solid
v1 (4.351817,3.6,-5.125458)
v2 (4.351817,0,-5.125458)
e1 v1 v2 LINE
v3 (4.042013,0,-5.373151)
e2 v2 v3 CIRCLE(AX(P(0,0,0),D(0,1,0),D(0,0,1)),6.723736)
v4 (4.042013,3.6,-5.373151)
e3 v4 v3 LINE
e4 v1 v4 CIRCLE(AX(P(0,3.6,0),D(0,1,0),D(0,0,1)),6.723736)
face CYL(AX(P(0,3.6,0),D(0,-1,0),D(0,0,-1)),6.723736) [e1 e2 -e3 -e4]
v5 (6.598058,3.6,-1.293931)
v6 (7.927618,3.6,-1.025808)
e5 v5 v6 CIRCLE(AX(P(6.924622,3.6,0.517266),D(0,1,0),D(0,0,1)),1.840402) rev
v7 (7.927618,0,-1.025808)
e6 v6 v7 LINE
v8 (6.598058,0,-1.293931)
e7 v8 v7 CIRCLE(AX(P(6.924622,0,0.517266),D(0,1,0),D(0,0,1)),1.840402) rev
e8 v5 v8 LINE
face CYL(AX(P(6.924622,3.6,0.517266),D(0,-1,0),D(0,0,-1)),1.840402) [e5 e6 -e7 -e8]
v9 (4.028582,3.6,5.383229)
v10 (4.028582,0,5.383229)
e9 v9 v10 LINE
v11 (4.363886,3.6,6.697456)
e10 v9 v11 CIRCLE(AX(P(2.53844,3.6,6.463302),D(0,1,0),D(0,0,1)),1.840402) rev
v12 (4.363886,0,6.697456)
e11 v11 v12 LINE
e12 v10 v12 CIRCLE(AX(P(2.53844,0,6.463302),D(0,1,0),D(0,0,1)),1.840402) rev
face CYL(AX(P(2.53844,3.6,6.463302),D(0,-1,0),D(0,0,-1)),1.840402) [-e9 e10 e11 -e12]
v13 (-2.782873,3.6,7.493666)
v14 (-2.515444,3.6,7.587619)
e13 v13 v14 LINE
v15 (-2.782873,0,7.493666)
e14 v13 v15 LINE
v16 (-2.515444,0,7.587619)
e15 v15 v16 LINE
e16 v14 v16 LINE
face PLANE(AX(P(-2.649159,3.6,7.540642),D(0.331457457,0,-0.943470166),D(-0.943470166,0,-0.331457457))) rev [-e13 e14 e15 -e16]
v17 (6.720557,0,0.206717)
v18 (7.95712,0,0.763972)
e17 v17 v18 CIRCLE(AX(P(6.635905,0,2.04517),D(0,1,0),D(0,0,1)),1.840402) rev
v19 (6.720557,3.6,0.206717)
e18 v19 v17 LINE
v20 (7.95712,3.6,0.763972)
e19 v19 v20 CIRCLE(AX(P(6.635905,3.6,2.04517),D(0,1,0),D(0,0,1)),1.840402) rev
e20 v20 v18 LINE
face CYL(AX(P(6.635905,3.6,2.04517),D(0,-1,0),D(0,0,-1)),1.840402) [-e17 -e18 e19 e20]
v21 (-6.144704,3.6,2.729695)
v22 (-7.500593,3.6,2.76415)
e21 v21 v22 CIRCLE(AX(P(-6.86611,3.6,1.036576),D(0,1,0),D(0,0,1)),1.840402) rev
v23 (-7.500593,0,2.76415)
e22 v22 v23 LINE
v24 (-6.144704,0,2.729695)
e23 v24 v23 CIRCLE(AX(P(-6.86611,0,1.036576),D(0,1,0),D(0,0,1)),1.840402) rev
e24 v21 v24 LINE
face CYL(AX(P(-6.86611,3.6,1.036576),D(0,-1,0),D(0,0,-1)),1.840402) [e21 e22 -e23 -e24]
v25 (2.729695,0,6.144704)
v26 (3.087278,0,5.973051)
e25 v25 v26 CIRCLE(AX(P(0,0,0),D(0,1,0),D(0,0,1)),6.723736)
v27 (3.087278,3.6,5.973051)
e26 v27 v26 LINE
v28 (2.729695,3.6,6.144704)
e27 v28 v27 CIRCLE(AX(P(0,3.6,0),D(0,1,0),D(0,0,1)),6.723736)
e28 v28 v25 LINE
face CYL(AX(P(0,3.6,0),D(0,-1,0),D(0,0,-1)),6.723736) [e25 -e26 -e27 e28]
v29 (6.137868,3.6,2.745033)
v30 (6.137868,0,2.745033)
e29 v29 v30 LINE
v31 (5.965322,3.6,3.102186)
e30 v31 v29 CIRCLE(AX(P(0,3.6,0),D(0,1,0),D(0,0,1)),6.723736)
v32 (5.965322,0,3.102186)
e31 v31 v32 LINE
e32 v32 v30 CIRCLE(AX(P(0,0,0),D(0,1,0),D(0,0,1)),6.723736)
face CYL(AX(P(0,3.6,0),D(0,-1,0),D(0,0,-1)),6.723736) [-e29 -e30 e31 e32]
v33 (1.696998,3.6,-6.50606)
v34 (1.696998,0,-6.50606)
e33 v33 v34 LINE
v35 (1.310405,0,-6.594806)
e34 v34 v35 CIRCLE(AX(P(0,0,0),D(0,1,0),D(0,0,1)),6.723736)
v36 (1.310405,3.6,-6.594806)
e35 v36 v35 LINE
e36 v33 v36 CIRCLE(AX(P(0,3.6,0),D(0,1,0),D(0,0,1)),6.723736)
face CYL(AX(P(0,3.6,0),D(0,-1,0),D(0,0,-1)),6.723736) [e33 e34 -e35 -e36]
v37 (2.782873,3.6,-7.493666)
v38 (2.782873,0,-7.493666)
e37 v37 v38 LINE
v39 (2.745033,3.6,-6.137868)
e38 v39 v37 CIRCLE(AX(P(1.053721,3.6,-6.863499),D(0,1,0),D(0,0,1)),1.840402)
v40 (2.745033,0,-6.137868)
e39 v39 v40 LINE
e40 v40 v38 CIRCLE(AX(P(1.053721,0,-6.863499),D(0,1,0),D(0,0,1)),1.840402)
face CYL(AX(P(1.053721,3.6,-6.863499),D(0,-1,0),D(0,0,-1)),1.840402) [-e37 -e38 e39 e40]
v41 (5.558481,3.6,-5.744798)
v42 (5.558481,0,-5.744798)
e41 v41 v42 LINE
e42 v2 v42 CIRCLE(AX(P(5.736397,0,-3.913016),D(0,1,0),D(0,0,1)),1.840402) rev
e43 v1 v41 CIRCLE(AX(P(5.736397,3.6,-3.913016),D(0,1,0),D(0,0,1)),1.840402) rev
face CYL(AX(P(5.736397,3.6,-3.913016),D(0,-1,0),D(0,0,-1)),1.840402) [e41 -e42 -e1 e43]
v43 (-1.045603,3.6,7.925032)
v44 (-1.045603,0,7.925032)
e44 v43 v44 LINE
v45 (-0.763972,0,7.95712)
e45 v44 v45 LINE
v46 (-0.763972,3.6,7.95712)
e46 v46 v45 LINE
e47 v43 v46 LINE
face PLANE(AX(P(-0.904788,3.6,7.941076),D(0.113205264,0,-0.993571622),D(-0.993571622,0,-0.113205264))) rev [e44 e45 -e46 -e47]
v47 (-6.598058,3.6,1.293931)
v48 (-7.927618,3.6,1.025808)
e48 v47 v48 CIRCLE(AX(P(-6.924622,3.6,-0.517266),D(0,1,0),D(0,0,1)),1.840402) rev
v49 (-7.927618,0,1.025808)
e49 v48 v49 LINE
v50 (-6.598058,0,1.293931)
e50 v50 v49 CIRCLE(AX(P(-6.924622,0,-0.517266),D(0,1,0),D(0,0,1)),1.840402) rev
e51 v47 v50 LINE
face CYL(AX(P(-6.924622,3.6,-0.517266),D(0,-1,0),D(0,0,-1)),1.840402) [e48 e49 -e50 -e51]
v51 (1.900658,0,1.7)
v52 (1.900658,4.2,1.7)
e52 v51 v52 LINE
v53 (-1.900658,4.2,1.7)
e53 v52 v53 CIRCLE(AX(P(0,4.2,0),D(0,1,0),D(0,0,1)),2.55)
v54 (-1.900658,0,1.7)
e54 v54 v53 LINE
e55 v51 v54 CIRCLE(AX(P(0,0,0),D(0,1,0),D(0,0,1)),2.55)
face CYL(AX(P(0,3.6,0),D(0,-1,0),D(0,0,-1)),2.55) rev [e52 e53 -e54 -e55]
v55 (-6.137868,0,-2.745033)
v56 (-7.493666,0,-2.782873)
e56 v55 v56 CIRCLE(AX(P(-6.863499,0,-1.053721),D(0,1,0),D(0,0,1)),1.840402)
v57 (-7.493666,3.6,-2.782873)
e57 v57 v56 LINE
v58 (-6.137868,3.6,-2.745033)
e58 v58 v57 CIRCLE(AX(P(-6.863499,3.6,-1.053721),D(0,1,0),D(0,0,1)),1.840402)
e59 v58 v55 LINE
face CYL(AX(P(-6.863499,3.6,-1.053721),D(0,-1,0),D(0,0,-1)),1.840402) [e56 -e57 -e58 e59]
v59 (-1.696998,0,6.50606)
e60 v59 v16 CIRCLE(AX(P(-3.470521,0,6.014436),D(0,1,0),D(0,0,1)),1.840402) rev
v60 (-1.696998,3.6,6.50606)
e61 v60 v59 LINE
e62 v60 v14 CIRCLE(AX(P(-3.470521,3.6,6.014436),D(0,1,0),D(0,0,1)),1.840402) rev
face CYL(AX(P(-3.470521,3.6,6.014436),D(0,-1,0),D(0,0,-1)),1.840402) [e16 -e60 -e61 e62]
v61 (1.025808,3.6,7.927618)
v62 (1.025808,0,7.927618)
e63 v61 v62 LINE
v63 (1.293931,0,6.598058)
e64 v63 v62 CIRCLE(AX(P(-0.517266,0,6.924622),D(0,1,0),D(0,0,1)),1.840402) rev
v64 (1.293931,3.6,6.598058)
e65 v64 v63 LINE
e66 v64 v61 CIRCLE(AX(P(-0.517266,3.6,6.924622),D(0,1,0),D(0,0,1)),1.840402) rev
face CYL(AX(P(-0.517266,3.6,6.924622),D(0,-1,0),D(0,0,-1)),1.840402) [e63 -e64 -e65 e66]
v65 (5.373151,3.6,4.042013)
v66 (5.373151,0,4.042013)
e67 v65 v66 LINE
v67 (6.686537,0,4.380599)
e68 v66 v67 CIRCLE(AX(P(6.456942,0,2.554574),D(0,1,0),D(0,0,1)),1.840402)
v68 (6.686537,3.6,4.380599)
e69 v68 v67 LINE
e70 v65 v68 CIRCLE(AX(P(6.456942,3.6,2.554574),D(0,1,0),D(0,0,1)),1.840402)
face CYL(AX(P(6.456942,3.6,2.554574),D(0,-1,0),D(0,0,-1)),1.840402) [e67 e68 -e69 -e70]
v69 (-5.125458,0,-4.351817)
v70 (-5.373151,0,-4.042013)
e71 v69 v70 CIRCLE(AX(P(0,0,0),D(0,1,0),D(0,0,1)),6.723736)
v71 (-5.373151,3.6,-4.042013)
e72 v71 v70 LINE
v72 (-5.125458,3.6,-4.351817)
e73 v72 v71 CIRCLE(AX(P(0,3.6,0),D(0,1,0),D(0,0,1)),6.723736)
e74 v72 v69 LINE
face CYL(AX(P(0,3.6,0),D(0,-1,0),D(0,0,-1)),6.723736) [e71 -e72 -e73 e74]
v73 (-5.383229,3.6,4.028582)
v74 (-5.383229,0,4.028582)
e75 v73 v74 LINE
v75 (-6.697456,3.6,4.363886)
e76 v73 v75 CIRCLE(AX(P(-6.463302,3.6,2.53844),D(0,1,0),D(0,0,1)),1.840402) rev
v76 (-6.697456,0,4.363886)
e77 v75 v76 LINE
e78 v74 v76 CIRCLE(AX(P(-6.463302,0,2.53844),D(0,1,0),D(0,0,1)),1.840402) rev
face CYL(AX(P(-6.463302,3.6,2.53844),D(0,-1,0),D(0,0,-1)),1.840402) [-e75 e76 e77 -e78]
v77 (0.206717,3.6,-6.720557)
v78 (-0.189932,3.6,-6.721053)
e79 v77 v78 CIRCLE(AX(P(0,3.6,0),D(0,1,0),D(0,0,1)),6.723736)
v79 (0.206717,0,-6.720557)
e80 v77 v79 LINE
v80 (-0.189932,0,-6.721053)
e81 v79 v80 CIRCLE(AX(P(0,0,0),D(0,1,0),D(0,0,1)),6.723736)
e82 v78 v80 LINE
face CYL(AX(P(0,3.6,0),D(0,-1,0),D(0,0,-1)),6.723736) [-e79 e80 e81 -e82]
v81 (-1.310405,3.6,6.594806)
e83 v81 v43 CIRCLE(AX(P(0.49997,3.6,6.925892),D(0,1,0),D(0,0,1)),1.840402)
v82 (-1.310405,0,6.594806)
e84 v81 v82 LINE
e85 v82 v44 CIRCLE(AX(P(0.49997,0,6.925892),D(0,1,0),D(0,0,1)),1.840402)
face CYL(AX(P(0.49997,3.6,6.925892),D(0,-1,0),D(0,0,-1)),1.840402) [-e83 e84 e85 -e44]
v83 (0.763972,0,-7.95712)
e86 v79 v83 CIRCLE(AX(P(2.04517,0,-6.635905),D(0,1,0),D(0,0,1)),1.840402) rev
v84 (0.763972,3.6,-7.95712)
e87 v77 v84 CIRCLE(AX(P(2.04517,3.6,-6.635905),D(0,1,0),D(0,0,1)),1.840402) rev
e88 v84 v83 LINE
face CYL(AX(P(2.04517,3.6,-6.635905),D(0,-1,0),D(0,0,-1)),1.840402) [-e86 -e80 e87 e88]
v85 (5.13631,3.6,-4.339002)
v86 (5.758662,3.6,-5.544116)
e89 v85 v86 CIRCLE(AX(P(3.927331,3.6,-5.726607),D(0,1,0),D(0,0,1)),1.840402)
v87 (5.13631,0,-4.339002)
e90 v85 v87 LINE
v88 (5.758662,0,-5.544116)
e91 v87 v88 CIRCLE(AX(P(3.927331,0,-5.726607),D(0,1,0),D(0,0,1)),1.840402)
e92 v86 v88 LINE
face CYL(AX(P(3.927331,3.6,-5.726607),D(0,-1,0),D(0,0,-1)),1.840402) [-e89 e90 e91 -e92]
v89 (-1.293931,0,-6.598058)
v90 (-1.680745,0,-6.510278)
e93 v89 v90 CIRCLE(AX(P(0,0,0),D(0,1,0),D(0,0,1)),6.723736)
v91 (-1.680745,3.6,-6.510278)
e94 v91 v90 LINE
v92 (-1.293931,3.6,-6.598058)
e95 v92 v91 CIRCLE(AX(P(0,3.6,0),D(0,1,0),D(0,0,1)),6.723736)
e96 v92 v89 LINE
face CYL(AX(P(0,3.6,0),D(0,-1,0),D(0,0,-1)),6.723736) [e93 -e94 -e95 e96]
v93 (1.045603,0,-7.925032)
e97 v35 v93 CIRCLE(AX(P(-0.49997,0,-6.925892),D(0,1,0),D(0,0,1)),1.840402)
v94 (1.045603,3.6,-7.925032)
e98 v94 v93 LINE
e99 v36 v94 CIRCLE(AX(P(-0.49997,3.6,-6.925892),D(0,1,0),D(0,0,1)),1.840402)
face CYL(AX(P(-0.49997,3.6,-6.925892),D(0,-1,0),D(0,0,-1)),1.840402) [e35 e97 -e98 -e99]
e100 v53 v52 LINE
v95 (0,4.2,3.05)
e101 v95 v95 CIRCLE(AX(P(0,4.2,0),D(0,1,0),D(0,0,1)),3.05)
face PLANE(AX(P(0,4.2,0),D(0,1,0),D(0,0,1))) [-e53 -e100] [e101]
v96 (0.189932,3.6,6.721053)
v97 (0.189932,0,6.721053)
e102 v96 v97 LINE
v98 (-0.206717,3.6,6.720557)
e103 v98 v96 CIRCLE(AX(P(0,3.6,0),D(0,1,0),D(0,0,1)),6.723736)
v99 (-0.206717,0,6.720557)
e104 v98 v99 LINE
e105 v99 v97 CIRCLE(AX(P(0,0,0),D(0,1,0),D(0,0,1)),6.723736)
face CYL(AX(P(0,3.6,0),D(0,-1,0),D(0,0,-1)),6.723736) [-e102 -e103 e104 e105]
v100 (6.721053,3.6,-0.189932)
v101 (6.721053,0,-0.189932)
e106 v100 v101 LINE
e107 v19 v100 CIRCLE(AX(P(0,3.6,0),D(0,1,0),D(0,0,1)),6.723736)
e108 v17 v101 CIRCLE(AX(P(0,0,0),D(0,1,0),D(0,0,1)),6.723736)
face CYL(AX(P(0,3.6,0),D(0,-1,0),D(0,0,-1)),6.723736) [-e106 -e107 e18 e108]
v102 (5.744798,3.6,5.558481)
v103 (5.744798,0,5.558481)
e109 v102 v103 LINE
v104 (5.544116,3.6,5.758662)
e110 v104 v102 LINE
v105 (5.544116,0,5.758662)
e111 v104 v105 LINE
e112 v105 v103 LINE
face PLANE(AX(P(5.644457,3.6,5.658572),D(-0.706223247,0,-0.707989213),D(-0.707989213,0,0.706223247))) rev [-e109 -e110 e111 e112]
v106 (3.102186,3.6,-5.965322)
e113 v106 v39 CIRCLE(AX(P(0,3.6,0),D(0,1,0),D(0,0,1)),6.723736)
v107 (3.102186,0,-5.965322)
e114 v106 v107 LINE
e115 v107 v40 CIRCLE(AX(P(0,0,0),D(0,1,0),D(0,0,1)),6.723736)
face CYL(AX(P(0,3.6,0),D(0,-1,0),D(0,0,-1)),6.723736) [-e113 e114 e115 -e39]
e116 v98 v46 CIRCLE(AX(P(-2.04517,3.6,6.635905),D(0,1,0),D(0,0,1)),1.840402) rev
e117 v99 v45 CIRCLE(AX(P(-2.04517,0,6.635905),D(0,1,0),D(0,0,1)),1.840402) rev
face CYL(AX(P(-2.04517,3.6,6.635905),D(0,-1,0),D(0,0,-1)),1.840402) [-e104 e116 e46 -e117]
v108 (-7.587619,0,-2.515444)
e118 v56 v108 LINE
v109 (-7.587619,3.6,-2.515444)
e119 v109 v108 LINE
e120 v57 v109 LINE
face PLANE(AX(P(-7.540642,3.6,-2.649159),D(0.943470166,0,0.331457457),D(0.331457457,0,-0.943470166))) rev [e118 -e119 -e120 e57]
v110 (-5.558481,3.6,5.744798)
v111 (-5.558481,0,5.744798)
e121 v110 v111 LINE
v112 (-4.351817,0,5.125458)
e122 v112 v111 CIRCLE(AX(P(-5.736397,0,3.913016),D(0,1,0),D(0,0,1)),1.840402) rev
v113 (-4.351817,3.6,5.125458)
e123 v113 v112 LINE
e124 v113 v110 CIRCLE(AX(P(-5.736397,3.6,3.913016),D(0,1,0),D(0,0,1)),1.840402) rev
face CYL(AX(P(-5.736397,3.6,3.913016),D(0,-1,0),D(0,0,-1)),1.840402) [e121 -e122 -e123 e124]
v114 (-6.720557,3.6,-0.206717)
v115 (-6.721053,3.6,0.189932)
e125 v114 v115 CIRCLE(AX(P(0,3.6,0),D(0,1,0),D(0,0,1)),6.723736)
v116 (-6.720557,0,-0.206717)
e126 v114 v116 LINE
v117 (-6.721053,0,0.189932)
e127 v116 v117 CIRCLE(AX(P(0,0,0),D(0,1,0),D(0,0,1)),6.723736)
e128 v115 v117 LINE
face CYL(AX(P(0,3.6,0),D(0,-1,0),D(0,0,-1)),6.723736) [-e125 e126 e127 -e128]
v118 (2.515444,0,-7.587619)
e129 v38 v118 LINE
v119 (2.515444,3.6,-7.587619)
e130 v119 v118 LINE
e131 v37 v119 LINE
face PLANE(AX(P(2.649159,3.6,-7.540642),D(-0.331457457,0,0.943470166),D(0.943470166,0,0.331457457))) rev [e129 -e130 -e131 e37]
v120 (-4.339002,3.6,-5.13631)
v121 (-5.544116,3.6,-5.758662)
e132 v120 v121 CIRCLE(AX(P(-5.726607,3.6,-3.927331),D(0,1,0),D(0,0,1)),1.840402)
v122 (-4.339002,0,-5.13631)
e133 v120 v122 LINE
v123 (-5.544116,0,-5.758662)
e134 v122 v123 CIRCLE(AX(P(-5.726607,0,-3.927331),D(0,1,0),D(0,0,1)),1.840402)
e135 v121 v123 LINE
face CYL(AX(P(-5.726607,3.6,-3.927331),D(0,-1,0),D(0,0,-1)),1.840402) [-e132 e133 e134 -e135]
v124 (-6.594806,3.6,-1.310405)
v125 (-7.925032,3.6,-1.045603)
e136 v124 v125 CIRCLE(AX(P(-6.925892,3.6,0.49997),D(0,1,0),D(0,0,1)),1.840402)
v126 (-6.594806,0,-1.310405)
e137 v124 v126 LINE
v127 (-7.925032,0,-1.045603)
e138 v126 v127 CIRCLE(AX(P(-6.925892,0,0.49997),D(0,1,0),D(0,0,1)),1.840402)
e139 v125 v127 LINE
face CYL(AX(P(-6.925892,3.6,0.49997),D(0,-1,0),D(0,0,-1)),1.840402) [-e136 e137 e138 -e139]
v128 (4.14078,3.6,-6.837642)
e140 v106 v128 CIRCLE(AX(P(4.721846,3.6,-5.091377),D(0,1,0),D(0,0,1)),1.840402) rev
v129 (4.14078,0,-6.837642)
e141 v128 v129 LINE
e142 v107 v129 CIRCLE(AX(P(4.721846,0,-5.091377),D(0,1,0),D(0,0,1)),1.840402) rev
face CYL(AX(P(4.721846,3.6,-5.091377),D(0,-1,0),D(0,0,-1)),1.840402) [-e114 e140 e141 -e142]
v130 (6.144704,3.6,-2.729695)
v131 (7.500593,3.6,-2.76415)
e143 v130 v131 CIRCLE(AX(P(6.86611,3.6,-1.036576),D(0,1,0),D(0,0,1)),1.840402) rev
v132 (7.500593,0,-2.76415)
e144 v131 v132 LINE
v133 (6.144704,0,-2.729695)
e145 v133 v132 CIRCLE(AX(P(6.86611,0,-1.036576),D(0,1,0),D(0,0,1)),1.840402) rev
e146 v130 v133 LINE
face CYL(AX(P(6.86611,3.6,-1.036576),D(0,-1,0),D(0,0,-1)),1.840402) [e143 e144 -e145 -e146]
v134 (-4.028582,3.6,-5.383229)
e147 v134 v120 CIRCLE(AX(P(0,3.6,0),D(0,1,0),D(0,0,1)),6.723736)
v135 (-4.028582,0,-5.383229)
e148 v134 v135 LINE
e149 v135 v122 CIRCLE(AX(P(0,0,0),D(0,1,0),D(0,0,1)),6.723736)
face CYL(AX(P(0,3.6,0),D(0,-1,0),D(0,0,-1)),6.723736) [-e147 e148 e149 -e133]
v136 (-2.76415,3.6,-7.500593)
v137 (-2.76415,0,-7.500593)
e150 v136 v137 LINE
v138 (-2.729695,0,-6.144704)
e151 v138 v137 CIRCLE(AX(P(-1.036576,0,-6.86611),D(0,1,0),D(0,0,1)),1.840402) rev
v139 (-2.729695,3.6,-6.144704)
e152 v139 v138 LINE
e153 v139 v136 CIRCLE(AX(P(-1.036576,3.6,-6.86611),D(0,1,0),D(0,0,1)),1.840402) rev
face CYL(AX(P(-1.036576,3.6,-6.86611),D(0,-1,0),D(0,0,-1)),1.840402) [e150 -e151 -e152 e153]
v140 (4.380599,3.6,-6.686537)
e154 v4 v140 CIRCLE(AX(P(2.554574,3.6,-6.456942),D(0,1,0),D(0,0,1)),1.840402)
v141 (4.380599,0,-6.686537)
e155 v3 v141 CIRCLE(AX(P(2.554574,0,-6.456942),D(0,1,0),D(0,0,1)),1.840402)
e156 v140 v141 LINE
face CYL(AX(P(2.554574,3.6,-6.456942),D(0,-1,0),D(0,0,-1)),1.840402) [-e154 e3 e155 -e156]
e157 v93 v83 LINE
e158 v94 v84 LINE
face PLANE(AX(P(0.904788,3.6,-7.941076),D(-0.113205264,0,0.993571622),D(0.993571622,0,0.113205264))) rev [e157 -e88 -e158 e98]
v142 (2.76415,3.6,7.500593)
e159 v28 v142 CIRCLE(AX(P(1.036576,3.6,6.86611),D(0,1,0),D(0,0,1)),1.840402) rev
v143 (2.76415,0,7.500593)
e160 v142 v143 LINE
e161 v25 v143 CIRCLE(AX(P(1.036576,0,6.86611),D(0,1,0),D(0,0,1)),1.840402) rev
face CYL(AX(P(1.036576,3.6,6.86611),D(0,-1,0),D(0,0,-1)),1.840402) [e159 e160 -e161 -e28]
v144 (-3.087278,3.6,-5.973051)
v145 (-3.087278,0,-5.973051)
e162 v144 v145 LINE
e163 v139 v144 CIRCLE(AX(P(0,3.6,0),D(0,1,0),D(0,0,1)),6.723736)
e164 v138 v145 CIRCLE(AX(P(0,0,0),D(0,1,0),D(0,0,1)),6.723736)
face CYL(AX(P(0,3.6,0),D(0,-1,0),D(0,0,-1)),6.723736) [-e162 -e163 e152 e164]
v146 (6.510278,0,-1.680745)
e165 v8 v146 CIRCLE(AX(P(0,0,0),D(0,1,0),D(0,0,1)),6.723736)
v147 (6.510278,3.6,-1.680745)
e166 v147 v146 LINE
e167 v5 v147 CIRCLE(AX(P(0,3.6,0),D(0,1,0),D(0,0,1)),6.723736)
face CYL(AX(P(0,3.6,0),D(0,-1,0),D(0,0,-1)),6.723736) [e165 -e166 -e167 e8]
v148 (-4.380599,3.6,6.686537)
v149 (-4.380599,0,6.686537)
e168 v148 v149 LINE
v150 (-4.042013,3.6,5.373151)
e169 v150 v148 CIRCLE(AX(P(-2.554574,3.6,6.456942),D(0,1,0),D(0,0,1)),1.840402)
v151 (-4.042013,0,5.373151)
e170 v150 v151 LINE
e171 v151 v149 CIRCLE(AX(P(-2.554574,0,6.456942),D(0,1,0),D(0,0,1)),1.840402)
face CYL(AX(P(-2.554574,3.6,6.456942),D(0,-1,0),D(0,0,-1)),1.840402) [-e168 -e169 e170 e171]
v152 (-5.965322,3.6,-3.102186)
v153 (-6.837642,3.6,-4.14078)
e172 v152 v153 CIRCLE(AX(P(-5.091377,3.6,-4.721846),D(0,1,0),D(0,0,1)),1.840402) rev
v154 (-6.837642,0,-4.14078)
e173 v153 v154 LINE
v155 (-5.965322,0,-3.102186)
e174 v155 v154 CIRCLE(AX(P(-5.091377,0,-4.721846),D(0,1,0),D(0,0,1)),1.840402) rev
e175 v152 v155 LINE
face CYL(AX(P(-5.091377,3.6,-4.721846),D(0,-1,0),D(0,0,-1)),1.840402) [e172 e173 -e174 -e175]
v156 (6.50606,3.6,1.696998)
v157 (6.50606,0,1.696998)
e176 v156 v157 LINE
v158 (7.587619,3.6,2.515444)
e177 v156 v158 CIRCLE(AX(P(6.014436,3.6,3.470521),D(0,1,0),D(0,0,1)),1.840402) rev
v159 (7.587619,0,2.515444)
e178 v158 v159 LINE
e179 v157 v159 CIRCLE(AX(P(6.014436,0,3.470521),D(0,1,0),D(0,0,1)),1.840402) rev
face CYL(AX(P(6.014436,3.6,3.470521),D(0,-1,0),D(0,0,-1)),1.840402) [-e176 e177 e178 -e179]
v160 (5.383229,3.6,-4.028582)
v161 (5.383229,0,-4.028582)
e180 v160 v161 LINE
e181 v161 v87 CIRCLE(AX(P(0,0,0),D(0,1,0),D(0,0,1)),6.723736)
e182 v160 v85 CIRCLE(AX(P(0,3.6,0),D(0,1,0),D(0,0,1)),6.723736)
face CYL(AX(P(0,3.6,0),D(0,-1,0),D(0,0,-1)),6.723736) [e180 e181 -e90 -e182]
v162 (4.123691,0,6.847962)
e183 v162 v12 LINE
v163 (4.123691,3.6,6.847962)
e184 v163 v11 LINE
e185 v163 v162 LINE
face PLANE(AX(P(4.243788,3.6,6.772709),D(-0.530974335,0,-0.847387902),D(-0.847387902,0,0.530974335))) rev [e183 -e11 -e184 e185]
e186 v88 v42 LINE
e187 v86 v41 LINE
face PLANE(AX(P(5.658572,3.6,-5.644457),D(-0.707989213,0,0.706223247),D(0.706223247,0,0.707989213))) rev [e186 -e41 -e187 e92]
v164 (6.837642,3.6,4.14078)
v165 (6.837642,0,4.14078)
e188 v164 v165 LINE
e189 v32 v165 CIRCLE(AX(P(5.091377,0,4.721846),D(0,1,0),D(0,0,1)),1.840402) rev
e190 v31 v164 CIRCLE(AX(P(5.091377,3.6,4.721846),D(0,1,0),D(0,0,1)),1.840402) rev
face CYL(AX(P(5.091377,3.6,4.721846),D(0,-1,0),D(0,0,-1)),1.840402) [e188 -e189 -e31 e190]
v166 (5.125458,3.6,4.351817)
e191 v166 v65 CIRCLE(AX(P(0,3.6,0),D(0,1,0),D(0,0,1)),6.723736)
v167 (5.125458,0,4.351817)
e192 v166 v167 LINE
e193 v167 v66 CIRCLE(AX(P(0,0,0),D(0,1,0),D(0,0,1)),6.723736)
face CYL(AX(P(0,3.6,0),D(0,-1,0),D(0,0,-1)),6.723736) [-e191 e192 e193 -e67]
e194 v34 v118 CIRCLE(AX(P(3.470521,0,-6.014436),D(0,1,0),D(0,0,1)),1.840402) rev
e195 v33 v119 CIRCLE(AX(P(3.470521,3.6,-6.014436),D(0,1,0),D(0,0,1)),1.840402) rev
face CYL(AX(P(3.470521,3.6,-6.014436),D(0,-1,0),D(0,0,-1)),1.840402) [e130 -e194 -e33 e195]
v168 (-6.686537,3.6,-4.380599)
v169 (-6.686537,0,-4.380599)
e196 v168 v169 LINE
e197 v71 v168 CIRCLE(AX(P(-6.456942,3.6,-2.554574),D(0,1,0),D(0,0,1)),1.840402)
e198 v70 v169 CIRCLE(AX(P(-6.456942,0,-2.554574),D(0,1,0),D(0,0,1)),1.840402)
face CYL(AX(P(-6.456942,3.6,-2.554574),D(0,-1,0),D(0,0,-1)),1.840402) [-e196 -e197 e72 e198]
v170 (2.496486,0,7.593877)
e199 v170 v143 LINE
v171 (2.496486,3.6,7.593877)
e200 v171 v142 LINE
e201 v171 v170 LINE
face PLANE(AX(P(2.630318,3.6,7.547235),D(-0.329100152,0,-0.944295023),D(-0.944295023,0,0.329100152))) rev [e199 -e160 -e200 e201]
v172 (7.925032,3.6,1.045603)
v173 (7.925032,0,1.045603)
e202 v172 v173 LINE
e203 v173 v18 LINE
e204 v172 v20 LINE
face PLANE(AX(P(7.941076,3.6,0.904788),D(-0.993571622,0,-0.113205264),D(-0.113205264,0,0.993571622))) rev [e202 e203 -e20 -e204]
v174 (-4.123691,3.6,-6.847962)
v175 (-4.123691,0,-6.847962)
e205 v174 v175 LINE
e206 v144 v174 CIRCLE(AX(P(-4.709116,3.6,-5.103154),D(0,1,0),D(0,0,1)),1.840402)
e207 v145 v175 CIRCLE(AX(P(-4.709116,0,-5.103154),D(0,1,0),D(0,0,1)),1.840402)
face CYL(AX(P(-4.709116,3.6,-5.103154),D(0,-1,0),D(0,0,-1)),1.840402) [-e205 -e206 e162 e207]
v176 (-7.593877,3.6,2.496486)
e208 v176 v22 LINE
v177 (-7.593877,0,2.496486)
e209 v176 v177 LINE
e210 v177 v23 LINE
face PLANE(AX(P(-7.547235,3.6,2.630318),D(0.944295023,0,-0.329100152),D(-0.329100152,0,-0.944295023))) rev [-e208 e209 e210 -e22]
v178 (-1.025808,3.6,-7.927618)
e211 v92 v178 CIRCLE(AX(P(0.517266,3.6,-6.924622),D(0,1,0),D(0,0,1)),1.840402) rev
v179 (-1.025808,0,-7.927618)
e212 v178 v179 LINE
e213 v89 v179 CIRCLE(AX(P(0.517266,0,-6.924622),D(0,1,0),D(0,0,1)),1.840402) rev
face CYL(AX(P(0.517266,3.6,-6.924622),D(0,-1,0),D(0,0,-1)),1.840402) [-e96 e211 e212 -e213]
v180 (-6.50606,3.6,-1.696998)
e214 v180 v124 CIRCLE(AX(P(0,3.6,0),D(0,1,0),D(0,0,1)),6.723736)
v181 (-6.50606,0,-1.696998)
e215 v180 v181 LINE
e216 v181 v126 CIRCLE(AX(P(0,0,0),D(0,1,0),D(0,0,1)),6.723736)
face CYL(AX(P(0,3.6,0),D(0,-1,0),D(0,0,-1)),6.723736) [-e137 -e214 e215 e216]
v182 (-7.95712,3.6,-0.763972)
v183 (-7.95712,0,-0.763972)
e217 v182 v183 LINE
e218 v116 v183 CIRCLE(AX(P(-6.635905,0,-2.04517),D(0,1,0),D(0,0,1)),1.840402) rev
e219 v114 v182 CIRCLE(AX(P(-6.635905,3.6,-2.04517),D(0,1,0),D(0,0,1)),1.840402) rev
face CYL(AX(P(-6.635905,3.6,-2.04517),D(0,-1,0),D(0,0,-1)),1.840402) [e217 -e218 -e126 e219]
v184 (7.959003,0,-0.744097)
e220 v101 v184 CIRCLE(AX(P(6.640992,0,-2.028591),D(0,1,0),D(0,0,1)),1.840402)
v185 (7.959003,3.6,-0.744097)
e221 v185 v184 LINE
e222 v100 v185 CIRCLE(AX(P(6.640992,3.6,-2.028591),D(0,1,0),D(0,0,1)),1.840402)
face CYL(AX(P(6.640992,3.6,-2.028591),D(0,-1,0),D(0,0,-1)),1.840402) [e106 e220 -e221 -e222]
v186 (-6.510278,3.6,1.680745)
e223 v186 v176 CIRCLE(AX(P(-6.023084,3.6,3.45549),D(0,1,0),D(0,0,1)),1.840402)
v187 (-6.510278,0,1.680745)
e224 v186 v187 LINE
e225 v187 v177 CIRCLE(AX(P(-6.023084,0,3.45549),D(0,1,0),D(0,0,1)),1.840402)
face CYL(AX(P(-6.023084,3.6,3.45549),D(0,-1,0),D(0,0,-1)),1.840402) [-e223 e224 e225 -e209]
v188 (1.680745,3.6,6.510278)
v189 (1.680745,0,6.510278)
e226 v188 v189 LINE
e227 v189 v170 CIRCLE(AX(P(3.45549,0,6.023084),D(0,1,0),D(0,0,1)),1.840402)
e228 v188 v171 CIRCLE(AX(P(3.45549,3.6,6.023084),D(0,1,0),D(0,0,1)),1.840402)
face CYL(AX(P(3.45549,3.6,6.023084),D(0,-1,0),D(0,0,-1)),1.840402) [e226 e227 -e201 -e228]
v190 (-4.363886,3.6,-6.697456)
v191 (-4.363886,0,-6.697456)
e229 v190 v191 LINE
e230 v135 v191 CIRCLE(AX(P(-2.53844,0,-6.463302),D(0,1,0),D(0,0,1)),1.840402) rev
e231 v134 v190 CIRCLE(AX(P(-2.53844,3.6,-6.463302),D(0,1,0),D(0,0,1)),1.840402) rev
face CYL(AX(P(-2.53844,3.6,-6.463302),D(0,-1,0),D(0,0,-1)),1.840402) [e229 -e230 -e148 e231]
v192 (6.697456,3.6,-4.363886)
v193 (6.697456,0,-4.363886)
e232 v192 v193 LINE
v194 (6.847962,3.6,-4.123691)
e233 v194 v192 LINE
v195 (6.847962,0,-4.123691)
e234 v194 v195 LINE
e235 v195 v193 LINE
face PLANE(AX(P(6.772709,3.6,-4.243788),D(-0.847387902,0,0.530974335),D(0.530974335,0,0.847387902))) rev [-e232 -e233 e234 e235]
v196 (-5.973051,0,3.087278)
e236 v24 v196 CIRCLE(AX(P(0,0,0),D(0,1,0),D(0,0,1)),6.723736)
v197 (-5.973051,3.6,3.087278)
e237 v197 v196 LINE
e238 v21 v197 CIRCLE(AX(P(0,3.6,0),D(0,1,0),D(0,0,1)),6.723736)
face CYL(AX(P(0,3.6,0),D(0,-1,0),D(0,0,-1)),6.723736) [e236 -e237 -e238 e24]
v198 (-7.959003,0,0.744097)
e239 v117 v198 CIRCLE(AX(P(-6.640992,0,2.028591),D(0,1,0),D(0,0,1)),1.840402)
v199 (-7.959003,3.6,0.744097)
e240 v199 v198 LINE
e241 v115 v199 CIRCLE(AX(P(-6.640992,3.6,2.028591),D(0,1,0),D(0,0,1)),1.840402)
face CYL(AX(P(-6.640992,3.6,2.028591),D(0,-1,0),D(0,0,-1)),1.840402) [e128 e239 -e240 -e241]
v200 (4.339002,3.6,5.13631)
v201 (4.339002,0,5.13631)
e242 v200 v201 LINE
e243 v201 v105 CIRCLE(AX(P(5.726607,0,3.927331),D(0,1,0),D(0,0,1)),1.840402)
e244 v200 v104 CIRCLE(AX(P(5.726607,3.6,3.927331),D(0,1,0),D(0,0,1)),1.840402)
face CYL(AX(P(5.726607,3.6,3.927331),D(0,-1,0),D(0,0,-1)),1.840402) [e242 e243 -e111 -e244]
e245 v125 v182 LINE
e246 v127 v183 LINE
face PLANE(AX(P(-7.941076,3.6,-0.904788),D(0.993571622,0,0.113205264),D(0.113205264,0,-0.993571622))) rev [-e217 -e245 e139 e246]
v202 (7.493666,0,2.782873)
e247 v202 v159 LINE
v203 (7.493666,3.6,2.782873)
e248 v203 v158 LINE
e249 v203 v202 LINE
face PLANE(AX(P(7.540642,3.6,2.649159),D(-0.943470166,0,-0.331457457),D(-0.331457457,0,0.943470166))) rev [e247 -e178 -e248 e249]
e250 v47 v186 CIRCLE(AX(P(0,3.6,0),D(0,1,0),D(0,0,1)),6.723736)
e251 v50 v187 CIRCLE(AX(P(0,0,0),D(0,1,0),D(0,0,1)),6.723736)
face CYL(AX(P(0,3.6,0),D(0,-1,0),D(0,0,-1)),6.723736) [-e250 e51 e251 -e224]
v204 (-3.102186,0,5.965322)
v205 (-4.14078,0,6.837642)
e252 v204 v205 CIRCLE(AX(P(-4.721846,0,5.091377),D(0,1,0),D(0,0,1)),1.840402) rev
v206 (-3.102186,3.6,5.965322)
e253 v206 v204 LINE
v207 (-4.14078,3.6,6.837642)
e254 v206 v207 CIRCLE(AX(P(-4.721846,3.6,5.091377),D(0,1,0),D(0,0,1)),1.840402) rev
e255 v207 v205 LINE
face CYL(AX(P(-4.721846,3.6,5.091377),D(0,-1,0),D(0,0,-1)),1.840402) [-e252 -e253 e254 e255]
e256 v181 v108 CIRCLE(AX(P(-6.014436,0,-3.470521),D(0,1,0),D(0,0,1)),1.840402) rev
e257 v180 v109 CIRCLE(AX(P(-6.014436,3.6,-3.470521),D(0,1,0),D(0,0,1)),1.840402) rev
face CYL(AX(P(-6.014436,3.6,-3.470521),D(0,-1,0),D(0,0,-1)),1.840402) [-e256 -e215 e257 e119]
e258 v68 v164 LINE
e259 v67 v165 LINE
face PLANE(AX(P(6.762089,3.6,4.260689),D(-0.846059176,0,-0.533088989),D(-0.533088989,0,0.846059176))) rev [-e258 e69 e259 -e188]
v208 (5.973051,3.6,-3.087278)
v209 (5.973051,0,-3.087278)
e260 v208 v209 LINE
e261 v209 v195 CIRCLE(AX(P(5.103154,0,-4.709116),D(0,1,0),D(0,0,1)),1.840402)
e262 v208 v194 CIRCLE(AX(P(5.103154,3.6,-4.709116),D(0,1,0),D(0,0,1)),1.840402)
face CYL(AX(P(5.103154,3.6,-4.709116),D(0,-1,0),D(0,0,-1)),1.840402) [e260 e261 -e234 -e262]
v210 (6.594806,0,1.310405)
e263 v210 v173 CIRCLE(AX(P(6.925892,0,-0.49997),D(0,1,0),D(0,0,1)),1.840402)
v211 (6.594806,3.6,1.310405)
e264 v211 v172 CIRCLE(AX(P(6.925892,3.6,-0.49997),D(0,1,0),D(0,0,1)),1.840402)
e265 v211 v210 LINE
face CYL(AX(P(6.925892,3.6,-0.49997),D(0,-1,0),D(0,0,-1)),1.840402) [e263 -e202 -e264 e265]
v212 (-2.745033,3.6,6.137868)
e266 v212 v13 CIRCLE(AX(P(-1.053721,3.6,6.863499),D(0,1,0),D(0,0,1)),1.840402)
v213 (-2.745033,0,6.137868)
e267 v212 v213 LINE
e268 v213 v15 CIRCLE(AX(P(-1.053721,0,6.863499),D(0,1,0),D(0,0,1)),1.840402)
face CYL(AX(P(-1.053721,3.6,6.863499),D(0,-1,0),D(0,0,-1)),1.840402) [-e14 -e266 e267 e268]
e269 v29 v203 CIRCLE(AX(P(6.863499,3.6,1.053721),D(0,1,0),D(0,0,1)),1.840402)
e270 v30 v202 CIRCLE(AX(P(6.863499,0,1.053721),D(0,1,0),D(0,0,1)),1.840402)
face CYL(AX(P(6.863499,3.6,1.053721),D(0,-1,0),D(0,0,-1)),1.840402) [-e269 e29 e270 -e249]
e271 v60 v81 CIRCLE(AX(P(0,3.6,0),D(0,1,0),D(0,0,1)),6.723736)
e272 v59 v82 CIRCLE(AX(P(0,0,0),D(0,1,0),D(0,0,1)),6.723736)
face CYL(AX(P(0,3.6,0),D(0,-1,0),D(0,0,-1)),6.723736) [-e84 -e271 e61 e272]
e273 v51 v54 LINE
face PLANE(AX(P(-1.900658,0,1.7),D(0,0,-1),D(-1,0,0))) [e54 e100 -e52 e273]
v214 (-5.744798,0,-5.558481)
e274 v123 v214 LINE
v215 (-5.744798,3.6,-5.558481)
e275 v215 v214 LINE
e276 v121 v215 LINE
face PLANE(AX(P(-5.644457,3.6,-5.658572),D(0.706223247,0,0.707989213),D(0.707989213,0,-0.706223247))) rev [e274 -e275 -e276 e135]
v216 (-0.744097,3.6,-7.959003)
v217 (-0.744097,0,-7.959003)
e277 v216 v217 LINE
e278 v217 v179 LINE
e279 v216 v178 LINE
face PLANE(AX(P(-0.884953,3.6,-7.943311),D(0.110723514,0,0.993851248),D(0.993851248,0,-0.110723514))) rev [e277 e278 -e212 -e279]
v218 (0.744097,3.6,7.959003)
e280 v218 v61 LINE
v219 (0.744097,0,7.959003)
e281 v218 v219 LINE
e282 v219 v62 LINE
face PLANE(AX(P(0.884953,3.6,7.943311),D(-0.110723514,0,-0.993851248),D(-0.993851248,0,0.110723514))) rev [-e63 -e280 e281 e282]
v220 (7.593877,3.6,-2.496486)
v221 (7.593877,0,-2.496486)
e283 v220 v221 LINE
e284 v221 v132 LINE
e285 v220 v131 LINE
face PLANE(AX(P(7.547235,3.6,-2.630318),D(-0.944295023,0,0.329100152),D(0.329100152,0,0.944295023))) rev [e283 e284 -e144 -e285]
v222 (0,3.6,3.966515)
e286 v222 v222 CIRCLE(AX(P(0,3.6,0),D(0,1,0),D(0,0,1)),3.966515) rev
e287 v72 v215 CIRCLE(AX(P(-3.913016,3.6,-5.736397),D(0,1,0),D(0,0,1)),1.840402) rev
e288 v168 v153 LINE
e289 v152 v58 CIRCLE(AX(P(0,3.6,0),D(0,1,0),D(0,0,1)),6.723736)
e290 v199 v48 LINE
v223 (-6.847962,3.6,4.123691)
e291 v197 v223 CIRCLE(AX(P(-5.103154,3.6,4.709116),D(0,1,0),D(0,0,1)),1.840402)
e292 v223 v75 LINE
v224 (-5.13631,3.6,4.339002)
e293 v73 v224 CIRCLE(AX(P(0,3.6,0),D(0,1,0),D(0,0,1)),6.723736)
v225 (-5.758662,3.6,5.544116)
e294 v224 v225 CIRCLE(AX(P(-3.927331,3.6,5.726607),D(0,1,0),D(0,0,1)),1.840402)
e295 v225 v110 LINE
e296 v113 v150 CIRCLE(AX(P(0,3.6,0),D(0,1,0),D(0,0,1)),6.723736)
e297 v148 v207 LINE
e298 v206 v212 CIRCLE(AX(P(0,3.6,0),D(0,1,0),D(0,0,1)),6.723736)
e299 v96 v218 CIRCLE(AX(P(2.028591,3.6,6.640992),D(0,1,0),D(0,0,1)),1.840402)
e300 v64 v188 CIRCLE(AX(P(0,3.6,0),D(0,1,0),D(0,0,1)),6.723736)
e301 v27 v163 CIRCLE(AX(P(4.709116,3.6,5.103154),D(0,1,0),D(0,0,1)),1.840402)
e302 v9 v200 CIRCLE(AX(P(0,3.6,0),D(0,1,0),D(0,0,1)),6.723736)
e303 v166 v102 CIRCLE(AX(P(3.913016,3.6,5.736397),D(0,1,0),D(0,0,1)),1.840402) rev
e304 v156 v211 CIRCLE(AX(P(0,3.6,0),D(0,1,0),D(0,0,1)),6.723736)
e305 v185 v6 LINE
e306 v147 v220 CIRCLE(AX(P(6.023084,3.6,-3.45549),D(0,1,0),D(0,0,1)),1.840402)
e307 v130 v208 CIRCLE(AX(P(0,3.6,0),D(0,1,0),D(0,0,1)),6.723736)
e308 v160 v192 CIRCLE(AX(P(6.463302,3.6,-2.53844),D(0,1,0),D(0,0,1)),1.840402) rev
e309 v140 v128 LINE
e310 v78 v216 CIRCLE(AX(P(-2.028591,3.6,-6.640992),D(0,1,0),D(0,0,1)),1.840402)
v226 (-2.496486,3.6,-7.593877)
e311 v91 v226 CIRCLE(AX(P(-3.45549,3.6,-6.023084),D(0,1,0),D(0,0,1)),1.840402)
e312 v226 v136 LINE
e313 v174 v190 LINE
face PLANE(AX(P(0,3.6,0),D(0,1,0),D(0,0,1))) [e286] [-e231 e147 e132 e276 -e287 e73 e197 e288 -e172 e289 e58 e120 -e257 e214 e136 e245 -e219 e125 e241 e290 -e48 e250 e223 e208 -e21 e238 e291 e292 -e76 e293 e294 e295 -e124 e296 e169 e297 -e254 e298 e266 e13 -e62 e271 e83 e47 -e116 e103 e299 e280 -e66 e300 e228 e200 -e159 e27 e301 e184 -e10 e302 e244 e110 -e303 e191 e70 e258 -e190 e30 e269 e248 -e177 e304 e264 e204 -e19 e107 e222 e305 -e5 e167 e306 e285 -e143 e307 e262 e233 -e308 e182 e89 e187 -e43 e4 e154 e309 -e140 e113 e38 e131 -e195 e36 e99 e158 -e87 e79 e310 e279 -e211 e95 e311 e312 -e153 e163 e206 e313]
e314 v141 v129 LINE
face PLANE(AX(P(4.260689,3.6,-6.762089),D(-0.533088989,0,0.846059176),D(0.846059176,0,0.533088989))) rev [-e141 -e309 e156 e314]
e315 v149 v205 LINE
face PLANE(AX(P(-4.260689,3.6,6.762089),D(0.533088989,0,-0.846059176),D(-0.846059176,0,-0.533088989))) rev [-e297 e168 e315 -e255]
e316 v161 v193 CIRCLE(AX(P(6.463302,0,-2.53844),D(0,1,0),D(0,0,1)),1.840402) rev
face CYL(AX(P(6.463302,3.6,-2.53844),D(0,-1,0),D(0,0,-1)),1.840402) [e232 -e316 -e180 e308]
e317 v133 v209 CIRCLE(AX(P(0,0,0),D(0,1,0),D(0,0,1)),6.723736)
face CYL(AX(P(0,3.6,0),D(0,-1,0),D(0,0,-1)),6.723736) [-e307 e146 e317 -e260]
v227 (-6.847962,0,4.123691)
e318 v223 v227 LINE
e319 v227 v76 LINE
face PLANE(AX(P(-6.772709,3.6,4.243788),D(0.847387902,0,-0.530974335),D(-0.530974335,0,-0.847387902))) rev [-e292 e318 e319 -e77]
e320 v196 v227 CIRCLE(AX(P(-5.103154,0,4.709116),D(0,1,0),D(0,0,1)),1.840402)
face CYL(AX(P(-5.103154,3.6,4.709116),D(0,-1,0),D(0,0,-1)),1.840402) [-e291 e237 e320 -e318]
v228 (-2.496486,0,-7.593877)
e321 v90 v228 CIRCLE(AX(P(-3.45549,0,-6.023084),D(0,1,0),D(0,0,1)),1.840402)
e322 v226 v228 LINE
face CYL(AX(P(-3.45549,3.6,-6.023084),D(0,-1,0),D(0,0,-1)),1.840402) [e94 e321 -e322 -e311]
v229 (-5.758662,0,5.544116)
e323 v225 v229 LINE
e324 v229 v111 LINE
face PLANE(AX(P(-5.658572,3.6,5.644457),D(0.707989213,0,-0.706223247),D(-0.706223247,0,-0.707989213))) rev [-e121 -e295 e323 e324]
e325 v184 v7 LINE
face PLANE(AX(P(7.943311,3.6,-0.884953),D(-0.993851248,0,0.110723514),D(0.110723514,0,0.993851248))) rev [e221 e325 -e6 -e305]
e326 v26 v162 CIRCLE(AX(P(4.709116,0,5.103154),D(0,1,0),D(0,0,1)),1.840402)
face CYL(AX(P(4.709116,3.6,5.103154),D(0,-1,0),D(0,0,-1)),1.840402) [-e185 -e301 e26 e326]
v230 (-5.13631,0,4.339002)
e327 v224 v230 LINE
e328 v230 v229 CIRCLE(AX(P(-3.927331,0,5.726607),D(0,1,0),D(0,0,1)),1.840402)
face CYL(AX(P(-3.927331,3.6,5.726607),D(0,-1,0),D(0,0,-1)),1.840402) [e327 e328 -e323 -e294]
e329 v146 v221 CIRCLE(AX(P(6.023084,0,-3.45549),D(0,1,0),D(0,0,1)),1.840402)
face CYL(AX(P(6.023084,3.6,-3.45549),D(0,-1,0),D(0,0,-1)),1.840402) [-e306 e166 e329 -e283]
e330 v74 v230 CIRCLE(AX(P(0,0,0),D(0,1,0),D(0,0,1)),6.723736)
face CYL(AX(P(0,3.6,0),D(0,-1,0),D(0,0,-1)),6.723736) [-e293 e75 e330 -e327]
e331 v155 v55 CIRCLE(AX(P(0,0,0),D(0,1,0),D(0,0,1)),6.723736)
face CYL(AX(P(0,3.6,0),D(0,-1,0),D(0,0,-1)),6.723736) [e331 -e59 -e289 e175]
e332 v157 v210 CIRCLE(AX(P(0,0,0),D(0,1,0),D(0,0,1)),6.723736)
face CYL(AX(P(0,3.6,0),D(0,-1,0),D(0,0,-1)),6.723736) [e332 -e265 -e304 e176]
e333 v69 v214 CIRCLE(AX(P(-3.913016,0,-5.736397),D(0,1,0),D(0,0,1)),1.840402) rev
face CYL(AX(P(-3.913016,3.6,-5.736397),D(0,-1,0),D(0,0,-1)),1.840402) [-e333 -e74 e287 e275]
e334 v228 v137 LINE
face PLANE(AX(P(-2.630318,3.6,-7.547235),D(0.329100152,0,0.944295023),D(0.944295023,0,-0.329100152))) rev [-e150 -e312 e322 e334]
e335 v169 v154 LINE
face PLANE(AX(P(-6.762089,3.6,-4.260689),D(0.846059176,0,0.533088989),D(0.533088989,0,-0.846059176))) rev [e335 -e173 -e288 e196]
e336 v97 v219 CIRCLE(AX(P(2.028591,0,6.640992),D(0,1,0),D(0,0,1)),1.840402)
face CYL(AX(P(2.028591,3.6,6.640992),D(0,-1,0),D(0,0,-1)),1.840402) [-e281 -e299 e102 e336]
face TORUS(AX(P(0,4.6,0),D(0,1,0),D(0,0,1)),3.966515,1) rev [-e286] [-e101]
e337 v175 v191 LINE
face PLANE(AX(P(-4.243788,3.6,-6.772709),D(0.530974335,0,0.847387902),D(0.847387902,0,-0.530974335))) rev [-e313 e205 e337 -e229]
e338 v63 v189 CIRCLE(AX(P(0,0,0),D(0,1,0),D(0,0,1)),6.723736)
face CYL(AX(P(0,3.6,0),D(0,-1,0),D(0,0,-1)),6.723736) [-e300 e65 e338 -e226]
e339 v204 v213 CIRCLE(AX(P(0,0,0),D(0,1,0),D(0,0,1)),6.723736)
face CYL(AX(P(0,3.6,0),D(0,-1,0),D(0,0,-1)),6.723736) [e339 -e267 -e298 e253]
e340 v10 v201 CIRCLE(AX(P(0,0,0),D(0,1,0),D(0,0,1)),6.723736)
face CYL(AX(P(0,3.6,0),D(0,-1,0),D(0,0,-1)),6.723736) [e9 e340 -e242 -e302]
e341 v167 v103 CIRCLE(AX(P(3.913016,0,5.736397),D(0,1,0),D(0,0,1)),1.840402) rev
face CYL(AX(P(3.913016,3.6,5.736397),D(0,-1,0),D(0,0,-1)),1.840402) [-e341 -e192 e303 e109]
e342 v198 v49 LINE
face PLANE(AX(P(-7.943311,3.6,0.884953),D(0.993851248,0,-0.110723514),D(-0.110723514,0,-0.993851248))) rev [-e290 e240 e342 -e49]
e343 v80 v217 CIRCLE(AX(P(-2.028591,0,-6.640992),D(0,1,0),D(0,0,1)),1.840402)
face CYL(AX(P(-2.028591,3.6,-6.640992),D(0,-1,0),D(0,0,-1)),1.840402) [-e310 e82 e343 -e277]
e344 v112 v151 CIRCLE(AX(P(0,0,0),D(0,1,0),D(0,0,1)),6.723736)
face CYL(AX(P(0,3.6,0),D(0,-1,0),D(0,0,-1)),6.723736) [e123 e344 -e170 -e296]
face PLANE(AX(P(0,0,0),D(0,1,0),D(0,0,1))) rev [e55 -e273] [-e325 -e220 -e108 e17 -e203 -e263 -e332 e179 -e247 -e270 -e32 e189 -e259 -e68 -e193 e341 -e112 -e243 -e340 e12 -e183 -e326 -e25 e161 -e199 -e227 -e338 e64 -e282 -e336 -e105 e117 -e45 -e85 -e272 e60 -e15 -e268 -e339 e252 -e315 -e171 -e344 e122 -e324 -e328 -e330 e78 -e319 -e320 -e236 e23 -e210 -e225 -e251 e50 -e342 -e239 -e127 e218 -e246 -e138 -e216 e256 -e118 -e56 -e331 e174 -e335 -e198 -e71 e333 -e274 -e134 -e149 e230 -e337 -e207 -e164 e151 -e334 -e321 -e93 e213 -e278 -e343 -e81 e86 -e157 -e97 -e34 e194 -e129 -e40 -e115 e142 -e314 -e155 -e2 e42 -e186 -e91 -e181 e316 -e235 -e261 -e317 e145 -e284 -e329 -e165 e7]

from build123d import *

# Parameters (mm, degrees)
SKETCH1_R           = 2.55
BOSS_EXTRUDE2_DEPTH = 3.6
BOSS_EXTRUDE3_START = -3.6
BOSS_EXTRUDE3_DEPTH = 3.6
SKETCH5_R           = 3.05
BOSS_EXTRUDE6_DEPTH = 0.6
FILLET3_R           = 1


with BuildPart() as part:
    # Sketch1 → Boss-Extrude2 (new body)
    with BuildSketch(Plane(origin=(0, 0, 0), x_dir=(1, 0, 0), z_dir=(0, 1, 0))):
        with BuildLine():
            ThreePointArc((3.087277962, -5.973051053), (3.521946978, -6.509464465), (4.123690803, -6.847962431))
            Line((4.123690803, -6.847962431), (4.363885613, -6.697456058))
            ThreePointArc((4.363885613, -6.697456058), (4.321717278, -6.00832738), (4.02858155, -5.38322903))
            ThreePointArc((4.02858155, -5.38322903), (4.185613137, -5.262059175), (4.339002356, -5.136310217))
            ThreePointArc((4.339002356, -5.136310217), (4.882136527, -5.56255167), (5.544116261, -5.758662187))
            Line((5.544116261, -5.758662187), (5.744798067, -5.55848095))
            ThreePointArc((5.744798067, -5.55848095), (5.550341423, -4.896013504), (5.125457751, -4.35181651))
            ThreePointArc((5.125457751, -4.35181651), (5.251589399, -4.198741821), (5.373151055, -4.042013339))
            ThreePointArc((5.373151055, -4.042013339), (5.997515364, -4.336709306), (6.686536579, -4.380598575))
            Line((6.686536579, -4.380598575), (6.837642357, -4.140780396))
            ThreePointArc((6.837642357, -4.140780396), (6.500648273, -3.538193066), (5.965322098, -3.102185738))
            ThreePointArc((5.965322098, -3.102185738), (6.05422904, -2.924882019), (6.137867523, -2.745033035))
            ThreePointArc((6.137867523, -2.745033035), (6.812153737, -2.893406229), (7.493666033, -2.782873458))
            Line((7.493666033, -2.782873458), (7.587618709, -2.515443823))
            ThreePointArc((7.587618709, -2.515443823), (7.124985474, -2.002952854), (6.506060286, -1.696998421))
            ThreePointArc((6.506060286, -1.696998421), (6.553284356, -1.50435642), (6.594805684, -1.310405312))
            ThreePointArc((6.594805684, -1.310405312), (7.285202277, -1.305015683), (7.925031781, -1.045603446))
            Line((7.925031781, -1.045603446), (7.957120175, -0.763972393))
            ThreePointArc((7.957120175, -0.763972393), (7.392046152, -0.367276222), (6.720557445, -0.206716516))
            ThreePointArc((6.720557445, -0.206716516), (6.723730631, -0.008396108), (6.721052751, 0.189931605))
            ThreePointArc((6.721052751, 0.189931605), (7.392940354, 0.3488138), (7.959003343, 0.744097489))
            Line((7.959003343, 0.744097489), (7.927618409, 1.025807803))
            ThreePointArc((7.927618409, 1.025807803), (7.28843877, 1.286817174), (6.598057791, 1.293931018))
            ThreePointArc((6.598057791, 1.293931018), (6.557020976, 1.487985219), (6.510278168, 1.680744559))
            ThreePointArc((6.510278168, 1.680744559), (7.129965532, 1.985152302), (7.593877244, 2.496486269))
            Line((7.593877244, 2.496486269), (7.500592754, 2.764149712))
            ThreePointArc((7.500592754, 2.764149712), (6.819358634, 2.876384183), (6.144703968, 2.729695448))
            ThreePointArc((6.144703968, 2.729695448), (6.061514909, 2.909752755), (5.973051053, 3.087277962))
            ThreePointArc((5.973051053, 3.087277962), (6.509464465, 3.521946978), (6.847962431, 4.123690803))
            Line((6.847962431, 4.123690803), (6.697456058, 4.363885613))
            ThreePointArc((6.697456058, 4.363885613), (6.00832738, 4.321717278), (5.38322903, 4.02858155))
            ThreePointArc((5.38322903, 4.02858155), (5.262059175, 4.185613137), (5.136310217, 4.339002356))
            ThreePointArc((5.136310217, 4.339002356), (5.56255167, 4.882136527), (5.758662187, 5.544116261))
            Line((5.758662187, 5.544116261), (5.55848095, 5.744798067))
            ThreePointArc((5.55848095, 5.744798067), (4.896013504, 5.550341423), (4.35181651, 5.125457751))
            ThreePointArc((4.35181651, 5.125457751), (4.198741821, 5.251589399), (4.042013339, 5.373151055))
            ThreePointArc((4.042013339, 5.373151055), (4.336709306, 5.997515364), (4.380598575, 6.686536579))
            Line((4.380598575, 6.686536579), (4.140780396, 6.837642357))
            ThreePointArc((4.140780396, 6.837642357), (3.538193066, 6.500648273), (3.102185738, 5.965322098))
            ThreePointArc((3.102185738, 5.965322098), (2.924882019, 6.05422904), (2.745033035, 6.137867523))
            ThreePointArc((2.745033035, 6.137867523), (2.893406229, 6.812153737), (2.782873458, 7.493666033))
            Line((2.782873458, 7.493666033), (2.515443823, 7.587618709))
            ThreePointArc((2.515443823, 7.587618709), (2.002952854, 7.124985474), (1.696998421, 6.506060286))
            ThreePointArc((1.696998421, 6.506060286), (1.50435642, 6.553284356), (1.310405312, 6.594805684))
            ThreePointArc((1.310405312, 6.594805684), (1.305015683, 7.285202277), (1.045603446, 7.925031781))
            Line((1.045603446, 7.925031781), (0.763972393, 7.957120175))
            ThreePointArc((0.763972393, 7.957120175), (0.367276222, 7.392046152), (0.206716516, 6.720557445))
            ThreePointArc((0.206716516, 6.720557445), (0.008396108, 6.723730631), (-0.189931605, 6.721052751))
            ThreePointArc((-0.189931605, 6.721052751), (-0.3488138, 7.392940354), (-0.744097489, 7.959003343))
            Line((-0.744097489, 7.959003343), (-1.025807803, 7.927618409))
            ThreePointArc((-1.025807803, 7.927618409), (-1.286817174, 7.28843877), (-1.293931018, 6.598057791))
            ThreePointArc((-1.293931018, 6.598057791), (-1.487985219, 6.557020976), (-1.680744559, 6.510278168))
            ThreePointArc((-1.680744559, 6.510278168), (-1.985152302, 7.129965532), (-2.496486269, 7.593877244))
            Line((-2.496486269, 7.593877244), (-2.764149712, 7.500592754))
            ThreePointArc((-2.764149712, 7.500592754), (-2.876384183, 6.819358634), (-2.729695448, 6.144703968))
            ThreePointArc((-2.729695448, 6.144703968), (-2.909752755, 6.061514909), (-3.087277962, 5.973051053))
            ThreePointArc((-3.087277962, 5.973051053), (-3.521946978, 6.509464465), (-4.123690803, 6.847962431))
            Line((-4.123690803, 6.847962431), (-4.363885613, 6.697456058))
            ThreePointArc((-4.363885613, 6.697456058), (-4.321717278, 6.00832738), (-4.02858155, 5.38322903))
            ThreePointArc((-4.02858155, 5.38322903), (-4.185613137, 5.262059175), (-4.339002356, 5.136310217))
            ThreePointArc((-4.339002356, 5.136310217), (-4.882136527, 5.56255167), (-5.544116261, 5.758662187))
            Line((-5.544116261, 5.758662187), (-5.744798067, 5.55848095))
            ThreePointArc((-5.744798067, 5.55848095), (-5.550341423, 4.896013504), (-5.125457751, 4.35181651))
            ThreePointArc((-5.125457751, 4.35181651), (-5.251589399, 4.198741821), (-5.373151055, 4.042013339))
            ThreePointArc((-5.373151055, 4.042013339), (-5.997515364, 4.336709306), (-6.686536579, 4.380598575))
            Line((-6.686536579, 4.380598575), (-6.837642357, 4.140780396))
            ThreePointArc((-6.837642357, 4.140780396), (-6.500648273, 3.538193066), (-5.965322098, 3.102185738))
            ThreePointArc((-5.965322098, 3.102185738), (-6.05422904, 2.924882019), (-6.137867523, 2.745033035))
            ThreePointArc((-6.137867523, 2.745033035), (-6.812153737, 2.893406229), (-7.493666033, 2.782873458))
            Line((-7.493666033, 2.782873458), (-7.587618709, 2.515443823))
            ThreePointArc((-7.587618709, 2.515443823), (-7.124985474, 2.002952854), (-6.506060286, 1.696998421))
            ThreePointArc((-6.506060286, 1.696998421), (-6.553284356, 1.50435642), (-6.594805684, 1.310405312))
            ThreePointArc((-6.594805684, 1.310405312), (-7.285202277, 1.305015683), (-7.925031781, 1.045603446))
            Line((-7.925031781, 1.045603446), (-7.957120175, 0.763972393))
            ThreePointArc((-7.957120175, 0.763972393), (-7.392046152, 0.367276222), (-6.720557445, 0.206716516))
            ThreePointArc((-6.720557445, 0.206716516), (-6.723730631, 0.008396108), (-6.721052751, -0.189931605))
            ThreePointArc((-6.721052751, -0.189931605), (-7.392940354, -0.3488138), (-7.959003343, -0.744097489))
            Line((-7.959003343, -0.744097489), (-7.927618409, -1.025807803))
            ThreePointArc((-7.927618409, -1.025807803), (-7.28843877, -1.286817174), (-6.598057791, -1.293931018))
            ThreePointArc((-6.598057791, -1.293931018), (-6.557020976, -1.487985219), (-6.510278168, -1.680744559))
            ThreePointArc((-6.510278168, -1.680744559), (-7.129965532, -1.985152302), (-7.593877244, -2.496486269))
            Line((-7.593877244, -2.496486269), (-7.500592754, -2.764149712))
            ThreePointArc((-7.500592754, -2.764149712), (-6.819358634, -2.876384183), (-6.144703968, -2.729695448))
            ThreePointArc((-6.144703968, -2.729695448), (-6.061514909, -2.909752755), (-5.973051053, -3.087277962))
            ThreePointArc((-5.973051053, -3.087277962), (-6.509464465, -3.521946978), (-6.847962431, -4.123690803))
            Line((-6.847962431, -4.123690803), (-6.697456058, -4.363885613))
            ThreePointArc((-6.697456058, -4.363885613), (-6.00832738, -4.321717278), (-5.38322903, -4.02858155))
            ThreePointArc((-5.38322903, -4.02858155), (-5.262059175, -4.185613137), (-5.136310217, -4.339002356))
            ThreePointArc((-5.136310217, -4.339002356), (-5.56255167, -4.882136527), (-5.758662187, -5.544116261))
            Line((-5.758662187, -5.544116261), (-5.55848095, -5.744798067))
            ThreePointArc((-5.55848095, -5.744798067), (-4.896013504, -5.550341423), (-4.35181651, -5.125457751))
            ThreePointArc((-4.35181651, -5.125457751), (-4.198741821, -5.251589399), (-4.042013339, -5.373151055))
            ThreePointArc((-4.042013339, -5.373151055), (-4.336709306, -5.997515364), (-4.380598575, -6.686536579))
            Line((-4.380598575, -6.686536579), (-4.140780396, -6.837642357))
            ThreePointArc((-4.140780396, -6.837642357), (-3.538193066, -6.500648273), (-3.102185738, -5.965322098))
            ThreePointArc((-3.102185738, -5.965322098), (-2.924882019, -6.05422904), (-2.745033035, -6.137867523))
            ThreePointArc((-2.745033035, -6.137867523), (-2.893406229, -6.812153737), (-2.782873458, -7.493666033))
            Line((-2.782873458, -7.493666033), (-2.515443823, -7.587618709))
            ThreePointArc((-2.515443823, -7.587618709), (-2.002952854, -7.124985474), (-1.696998421, -6.506060286))
            ThreePointArc((-1.696998421, -6.506060286), (-1.50435642, -6.553284356), (-1.310405312, -6.594805684))
            ThreePointArc((-1.310405312, -6.594805684), (-1.305015683, -7.285202277), (-1.045603446, -7.925031781))
            Line((-1.045603446, -7.925031781), (-0.763972393, -7.957120175))
            ThreePointArc((-0.763972393, -7.957120175), (-0.367276222, -7.392046152), (-0.206716516, -6.720557445))
            ThreePointArc((-0.206716516, -6.720557445), (-0.008396108, -6.723730631), (0.189931605, -6.721052751))
            ThreePointArc((0.189931605, -6.721052751), (0.3488138, -7.392940354), (0.744097489, -7.959003343))
            Line((0.744097489, -7.959003343), (1.025807803, -7.927618409))
            ThreePointArc((1.025807803, -7.927618409), (1.286817174, -7.28843877), (1.293931018, -6.598057791))
            ThreePointArc((1.293931018, -6.598057791), (1.487985219, -6.557020976), (1.680744559, -6.510278168))
            ThreePointArc((1.680744559, -6.510278168), (1.985152302, -7.129965532), (2.496486269, -7.593877244))
            Line((2.496486269, -7.593877244), (2.764149712, -7.500592754))
            ThreePointArc((2.764149712, -7.500592754), (2.876384183, -6.819358634), (2.729695448, -6.144703968))
            ThreePointArc((2.729695448, -6.144703968), (2.909752755, -6.061514909), (3.087277962, -5.973051053))
        make_face()
        with Locations(Location((0, 0, 0), (0, 0, 270))):
            Circle(SKETCH1_R, mode=Mode.SUBTRACT)
    extrude(amount=BOSS_EXTRUDE2_DEPTH)

    # Sketch2 → Boss-Extrude3 (add)
    with BuildSketch(Plane(origin=(0, 3.6, 0), x_dir=(1, 0, 0), z_dir=(0, 1, 0)).offset(BOSS_EXTRUDE3_START)):
        with BuildLine():
            Line((-1.900657781, -1.7), (1.900657781, -1.7))
            ThreePointArc((1.900657781, -1.7), (0, -2.55), (-1.900657781, -1.7))
        make_face()
    extrude(amount=BOSS_EXTRUDE3_DEPTH)

    # Sketch5 → Boss-Extrude6 (add)
    with BuildSketch(Plane(origin=(0, 3.6, 0), x_dir=(1, 0, 0), z_dir=(0, 1, 0))):
        with Locations(Location((0, 0, 0), (0, 0, 270))):
            Circle(SKETCH5_R)
        with BuildLine():
            Line((1.900657781, -1.7), (-1.900657781, -1.7))
            ThreePointArc((-1.900657781, -1.7), (0, 2.55), (1.900657781, -1.7))
        make_face(mode=Mode.SUBTRACT)
    extrude(amount=BOSS_EXTRUDE6_DEPTH)

    # Fillet3
    # the kernel refuses this fillet: 1 mm, written as the material it adds along each edge
    with BuildSketch(Plane(origin=(0, 3.6, 0), x_dir=(0, 0, 1), z_dir=(-1, 0, 0))) as fillet3_piece_1:
        with BuildLine():
            CenterArc((3.966515139, 1), FILLET3_R, 203.578178478, 66.421821522)
            Line((3.05, 0.6), (3.031669697, 0.592))
            ThreePointArc((3.031669697, 0.592), (3.03, 0.3), (3.03, 0))
            Line((3.03, 0), (3.05, -0.02))
            Line((3.05, -0.02), (3.966515139, -0.02))
            Line((3.966515139, -0.02), (3.966515139, 0))
        make_face()
    revolve(axis=Axis((0, 3.6, 0), (0, 1, 0)))


solid = part.part
